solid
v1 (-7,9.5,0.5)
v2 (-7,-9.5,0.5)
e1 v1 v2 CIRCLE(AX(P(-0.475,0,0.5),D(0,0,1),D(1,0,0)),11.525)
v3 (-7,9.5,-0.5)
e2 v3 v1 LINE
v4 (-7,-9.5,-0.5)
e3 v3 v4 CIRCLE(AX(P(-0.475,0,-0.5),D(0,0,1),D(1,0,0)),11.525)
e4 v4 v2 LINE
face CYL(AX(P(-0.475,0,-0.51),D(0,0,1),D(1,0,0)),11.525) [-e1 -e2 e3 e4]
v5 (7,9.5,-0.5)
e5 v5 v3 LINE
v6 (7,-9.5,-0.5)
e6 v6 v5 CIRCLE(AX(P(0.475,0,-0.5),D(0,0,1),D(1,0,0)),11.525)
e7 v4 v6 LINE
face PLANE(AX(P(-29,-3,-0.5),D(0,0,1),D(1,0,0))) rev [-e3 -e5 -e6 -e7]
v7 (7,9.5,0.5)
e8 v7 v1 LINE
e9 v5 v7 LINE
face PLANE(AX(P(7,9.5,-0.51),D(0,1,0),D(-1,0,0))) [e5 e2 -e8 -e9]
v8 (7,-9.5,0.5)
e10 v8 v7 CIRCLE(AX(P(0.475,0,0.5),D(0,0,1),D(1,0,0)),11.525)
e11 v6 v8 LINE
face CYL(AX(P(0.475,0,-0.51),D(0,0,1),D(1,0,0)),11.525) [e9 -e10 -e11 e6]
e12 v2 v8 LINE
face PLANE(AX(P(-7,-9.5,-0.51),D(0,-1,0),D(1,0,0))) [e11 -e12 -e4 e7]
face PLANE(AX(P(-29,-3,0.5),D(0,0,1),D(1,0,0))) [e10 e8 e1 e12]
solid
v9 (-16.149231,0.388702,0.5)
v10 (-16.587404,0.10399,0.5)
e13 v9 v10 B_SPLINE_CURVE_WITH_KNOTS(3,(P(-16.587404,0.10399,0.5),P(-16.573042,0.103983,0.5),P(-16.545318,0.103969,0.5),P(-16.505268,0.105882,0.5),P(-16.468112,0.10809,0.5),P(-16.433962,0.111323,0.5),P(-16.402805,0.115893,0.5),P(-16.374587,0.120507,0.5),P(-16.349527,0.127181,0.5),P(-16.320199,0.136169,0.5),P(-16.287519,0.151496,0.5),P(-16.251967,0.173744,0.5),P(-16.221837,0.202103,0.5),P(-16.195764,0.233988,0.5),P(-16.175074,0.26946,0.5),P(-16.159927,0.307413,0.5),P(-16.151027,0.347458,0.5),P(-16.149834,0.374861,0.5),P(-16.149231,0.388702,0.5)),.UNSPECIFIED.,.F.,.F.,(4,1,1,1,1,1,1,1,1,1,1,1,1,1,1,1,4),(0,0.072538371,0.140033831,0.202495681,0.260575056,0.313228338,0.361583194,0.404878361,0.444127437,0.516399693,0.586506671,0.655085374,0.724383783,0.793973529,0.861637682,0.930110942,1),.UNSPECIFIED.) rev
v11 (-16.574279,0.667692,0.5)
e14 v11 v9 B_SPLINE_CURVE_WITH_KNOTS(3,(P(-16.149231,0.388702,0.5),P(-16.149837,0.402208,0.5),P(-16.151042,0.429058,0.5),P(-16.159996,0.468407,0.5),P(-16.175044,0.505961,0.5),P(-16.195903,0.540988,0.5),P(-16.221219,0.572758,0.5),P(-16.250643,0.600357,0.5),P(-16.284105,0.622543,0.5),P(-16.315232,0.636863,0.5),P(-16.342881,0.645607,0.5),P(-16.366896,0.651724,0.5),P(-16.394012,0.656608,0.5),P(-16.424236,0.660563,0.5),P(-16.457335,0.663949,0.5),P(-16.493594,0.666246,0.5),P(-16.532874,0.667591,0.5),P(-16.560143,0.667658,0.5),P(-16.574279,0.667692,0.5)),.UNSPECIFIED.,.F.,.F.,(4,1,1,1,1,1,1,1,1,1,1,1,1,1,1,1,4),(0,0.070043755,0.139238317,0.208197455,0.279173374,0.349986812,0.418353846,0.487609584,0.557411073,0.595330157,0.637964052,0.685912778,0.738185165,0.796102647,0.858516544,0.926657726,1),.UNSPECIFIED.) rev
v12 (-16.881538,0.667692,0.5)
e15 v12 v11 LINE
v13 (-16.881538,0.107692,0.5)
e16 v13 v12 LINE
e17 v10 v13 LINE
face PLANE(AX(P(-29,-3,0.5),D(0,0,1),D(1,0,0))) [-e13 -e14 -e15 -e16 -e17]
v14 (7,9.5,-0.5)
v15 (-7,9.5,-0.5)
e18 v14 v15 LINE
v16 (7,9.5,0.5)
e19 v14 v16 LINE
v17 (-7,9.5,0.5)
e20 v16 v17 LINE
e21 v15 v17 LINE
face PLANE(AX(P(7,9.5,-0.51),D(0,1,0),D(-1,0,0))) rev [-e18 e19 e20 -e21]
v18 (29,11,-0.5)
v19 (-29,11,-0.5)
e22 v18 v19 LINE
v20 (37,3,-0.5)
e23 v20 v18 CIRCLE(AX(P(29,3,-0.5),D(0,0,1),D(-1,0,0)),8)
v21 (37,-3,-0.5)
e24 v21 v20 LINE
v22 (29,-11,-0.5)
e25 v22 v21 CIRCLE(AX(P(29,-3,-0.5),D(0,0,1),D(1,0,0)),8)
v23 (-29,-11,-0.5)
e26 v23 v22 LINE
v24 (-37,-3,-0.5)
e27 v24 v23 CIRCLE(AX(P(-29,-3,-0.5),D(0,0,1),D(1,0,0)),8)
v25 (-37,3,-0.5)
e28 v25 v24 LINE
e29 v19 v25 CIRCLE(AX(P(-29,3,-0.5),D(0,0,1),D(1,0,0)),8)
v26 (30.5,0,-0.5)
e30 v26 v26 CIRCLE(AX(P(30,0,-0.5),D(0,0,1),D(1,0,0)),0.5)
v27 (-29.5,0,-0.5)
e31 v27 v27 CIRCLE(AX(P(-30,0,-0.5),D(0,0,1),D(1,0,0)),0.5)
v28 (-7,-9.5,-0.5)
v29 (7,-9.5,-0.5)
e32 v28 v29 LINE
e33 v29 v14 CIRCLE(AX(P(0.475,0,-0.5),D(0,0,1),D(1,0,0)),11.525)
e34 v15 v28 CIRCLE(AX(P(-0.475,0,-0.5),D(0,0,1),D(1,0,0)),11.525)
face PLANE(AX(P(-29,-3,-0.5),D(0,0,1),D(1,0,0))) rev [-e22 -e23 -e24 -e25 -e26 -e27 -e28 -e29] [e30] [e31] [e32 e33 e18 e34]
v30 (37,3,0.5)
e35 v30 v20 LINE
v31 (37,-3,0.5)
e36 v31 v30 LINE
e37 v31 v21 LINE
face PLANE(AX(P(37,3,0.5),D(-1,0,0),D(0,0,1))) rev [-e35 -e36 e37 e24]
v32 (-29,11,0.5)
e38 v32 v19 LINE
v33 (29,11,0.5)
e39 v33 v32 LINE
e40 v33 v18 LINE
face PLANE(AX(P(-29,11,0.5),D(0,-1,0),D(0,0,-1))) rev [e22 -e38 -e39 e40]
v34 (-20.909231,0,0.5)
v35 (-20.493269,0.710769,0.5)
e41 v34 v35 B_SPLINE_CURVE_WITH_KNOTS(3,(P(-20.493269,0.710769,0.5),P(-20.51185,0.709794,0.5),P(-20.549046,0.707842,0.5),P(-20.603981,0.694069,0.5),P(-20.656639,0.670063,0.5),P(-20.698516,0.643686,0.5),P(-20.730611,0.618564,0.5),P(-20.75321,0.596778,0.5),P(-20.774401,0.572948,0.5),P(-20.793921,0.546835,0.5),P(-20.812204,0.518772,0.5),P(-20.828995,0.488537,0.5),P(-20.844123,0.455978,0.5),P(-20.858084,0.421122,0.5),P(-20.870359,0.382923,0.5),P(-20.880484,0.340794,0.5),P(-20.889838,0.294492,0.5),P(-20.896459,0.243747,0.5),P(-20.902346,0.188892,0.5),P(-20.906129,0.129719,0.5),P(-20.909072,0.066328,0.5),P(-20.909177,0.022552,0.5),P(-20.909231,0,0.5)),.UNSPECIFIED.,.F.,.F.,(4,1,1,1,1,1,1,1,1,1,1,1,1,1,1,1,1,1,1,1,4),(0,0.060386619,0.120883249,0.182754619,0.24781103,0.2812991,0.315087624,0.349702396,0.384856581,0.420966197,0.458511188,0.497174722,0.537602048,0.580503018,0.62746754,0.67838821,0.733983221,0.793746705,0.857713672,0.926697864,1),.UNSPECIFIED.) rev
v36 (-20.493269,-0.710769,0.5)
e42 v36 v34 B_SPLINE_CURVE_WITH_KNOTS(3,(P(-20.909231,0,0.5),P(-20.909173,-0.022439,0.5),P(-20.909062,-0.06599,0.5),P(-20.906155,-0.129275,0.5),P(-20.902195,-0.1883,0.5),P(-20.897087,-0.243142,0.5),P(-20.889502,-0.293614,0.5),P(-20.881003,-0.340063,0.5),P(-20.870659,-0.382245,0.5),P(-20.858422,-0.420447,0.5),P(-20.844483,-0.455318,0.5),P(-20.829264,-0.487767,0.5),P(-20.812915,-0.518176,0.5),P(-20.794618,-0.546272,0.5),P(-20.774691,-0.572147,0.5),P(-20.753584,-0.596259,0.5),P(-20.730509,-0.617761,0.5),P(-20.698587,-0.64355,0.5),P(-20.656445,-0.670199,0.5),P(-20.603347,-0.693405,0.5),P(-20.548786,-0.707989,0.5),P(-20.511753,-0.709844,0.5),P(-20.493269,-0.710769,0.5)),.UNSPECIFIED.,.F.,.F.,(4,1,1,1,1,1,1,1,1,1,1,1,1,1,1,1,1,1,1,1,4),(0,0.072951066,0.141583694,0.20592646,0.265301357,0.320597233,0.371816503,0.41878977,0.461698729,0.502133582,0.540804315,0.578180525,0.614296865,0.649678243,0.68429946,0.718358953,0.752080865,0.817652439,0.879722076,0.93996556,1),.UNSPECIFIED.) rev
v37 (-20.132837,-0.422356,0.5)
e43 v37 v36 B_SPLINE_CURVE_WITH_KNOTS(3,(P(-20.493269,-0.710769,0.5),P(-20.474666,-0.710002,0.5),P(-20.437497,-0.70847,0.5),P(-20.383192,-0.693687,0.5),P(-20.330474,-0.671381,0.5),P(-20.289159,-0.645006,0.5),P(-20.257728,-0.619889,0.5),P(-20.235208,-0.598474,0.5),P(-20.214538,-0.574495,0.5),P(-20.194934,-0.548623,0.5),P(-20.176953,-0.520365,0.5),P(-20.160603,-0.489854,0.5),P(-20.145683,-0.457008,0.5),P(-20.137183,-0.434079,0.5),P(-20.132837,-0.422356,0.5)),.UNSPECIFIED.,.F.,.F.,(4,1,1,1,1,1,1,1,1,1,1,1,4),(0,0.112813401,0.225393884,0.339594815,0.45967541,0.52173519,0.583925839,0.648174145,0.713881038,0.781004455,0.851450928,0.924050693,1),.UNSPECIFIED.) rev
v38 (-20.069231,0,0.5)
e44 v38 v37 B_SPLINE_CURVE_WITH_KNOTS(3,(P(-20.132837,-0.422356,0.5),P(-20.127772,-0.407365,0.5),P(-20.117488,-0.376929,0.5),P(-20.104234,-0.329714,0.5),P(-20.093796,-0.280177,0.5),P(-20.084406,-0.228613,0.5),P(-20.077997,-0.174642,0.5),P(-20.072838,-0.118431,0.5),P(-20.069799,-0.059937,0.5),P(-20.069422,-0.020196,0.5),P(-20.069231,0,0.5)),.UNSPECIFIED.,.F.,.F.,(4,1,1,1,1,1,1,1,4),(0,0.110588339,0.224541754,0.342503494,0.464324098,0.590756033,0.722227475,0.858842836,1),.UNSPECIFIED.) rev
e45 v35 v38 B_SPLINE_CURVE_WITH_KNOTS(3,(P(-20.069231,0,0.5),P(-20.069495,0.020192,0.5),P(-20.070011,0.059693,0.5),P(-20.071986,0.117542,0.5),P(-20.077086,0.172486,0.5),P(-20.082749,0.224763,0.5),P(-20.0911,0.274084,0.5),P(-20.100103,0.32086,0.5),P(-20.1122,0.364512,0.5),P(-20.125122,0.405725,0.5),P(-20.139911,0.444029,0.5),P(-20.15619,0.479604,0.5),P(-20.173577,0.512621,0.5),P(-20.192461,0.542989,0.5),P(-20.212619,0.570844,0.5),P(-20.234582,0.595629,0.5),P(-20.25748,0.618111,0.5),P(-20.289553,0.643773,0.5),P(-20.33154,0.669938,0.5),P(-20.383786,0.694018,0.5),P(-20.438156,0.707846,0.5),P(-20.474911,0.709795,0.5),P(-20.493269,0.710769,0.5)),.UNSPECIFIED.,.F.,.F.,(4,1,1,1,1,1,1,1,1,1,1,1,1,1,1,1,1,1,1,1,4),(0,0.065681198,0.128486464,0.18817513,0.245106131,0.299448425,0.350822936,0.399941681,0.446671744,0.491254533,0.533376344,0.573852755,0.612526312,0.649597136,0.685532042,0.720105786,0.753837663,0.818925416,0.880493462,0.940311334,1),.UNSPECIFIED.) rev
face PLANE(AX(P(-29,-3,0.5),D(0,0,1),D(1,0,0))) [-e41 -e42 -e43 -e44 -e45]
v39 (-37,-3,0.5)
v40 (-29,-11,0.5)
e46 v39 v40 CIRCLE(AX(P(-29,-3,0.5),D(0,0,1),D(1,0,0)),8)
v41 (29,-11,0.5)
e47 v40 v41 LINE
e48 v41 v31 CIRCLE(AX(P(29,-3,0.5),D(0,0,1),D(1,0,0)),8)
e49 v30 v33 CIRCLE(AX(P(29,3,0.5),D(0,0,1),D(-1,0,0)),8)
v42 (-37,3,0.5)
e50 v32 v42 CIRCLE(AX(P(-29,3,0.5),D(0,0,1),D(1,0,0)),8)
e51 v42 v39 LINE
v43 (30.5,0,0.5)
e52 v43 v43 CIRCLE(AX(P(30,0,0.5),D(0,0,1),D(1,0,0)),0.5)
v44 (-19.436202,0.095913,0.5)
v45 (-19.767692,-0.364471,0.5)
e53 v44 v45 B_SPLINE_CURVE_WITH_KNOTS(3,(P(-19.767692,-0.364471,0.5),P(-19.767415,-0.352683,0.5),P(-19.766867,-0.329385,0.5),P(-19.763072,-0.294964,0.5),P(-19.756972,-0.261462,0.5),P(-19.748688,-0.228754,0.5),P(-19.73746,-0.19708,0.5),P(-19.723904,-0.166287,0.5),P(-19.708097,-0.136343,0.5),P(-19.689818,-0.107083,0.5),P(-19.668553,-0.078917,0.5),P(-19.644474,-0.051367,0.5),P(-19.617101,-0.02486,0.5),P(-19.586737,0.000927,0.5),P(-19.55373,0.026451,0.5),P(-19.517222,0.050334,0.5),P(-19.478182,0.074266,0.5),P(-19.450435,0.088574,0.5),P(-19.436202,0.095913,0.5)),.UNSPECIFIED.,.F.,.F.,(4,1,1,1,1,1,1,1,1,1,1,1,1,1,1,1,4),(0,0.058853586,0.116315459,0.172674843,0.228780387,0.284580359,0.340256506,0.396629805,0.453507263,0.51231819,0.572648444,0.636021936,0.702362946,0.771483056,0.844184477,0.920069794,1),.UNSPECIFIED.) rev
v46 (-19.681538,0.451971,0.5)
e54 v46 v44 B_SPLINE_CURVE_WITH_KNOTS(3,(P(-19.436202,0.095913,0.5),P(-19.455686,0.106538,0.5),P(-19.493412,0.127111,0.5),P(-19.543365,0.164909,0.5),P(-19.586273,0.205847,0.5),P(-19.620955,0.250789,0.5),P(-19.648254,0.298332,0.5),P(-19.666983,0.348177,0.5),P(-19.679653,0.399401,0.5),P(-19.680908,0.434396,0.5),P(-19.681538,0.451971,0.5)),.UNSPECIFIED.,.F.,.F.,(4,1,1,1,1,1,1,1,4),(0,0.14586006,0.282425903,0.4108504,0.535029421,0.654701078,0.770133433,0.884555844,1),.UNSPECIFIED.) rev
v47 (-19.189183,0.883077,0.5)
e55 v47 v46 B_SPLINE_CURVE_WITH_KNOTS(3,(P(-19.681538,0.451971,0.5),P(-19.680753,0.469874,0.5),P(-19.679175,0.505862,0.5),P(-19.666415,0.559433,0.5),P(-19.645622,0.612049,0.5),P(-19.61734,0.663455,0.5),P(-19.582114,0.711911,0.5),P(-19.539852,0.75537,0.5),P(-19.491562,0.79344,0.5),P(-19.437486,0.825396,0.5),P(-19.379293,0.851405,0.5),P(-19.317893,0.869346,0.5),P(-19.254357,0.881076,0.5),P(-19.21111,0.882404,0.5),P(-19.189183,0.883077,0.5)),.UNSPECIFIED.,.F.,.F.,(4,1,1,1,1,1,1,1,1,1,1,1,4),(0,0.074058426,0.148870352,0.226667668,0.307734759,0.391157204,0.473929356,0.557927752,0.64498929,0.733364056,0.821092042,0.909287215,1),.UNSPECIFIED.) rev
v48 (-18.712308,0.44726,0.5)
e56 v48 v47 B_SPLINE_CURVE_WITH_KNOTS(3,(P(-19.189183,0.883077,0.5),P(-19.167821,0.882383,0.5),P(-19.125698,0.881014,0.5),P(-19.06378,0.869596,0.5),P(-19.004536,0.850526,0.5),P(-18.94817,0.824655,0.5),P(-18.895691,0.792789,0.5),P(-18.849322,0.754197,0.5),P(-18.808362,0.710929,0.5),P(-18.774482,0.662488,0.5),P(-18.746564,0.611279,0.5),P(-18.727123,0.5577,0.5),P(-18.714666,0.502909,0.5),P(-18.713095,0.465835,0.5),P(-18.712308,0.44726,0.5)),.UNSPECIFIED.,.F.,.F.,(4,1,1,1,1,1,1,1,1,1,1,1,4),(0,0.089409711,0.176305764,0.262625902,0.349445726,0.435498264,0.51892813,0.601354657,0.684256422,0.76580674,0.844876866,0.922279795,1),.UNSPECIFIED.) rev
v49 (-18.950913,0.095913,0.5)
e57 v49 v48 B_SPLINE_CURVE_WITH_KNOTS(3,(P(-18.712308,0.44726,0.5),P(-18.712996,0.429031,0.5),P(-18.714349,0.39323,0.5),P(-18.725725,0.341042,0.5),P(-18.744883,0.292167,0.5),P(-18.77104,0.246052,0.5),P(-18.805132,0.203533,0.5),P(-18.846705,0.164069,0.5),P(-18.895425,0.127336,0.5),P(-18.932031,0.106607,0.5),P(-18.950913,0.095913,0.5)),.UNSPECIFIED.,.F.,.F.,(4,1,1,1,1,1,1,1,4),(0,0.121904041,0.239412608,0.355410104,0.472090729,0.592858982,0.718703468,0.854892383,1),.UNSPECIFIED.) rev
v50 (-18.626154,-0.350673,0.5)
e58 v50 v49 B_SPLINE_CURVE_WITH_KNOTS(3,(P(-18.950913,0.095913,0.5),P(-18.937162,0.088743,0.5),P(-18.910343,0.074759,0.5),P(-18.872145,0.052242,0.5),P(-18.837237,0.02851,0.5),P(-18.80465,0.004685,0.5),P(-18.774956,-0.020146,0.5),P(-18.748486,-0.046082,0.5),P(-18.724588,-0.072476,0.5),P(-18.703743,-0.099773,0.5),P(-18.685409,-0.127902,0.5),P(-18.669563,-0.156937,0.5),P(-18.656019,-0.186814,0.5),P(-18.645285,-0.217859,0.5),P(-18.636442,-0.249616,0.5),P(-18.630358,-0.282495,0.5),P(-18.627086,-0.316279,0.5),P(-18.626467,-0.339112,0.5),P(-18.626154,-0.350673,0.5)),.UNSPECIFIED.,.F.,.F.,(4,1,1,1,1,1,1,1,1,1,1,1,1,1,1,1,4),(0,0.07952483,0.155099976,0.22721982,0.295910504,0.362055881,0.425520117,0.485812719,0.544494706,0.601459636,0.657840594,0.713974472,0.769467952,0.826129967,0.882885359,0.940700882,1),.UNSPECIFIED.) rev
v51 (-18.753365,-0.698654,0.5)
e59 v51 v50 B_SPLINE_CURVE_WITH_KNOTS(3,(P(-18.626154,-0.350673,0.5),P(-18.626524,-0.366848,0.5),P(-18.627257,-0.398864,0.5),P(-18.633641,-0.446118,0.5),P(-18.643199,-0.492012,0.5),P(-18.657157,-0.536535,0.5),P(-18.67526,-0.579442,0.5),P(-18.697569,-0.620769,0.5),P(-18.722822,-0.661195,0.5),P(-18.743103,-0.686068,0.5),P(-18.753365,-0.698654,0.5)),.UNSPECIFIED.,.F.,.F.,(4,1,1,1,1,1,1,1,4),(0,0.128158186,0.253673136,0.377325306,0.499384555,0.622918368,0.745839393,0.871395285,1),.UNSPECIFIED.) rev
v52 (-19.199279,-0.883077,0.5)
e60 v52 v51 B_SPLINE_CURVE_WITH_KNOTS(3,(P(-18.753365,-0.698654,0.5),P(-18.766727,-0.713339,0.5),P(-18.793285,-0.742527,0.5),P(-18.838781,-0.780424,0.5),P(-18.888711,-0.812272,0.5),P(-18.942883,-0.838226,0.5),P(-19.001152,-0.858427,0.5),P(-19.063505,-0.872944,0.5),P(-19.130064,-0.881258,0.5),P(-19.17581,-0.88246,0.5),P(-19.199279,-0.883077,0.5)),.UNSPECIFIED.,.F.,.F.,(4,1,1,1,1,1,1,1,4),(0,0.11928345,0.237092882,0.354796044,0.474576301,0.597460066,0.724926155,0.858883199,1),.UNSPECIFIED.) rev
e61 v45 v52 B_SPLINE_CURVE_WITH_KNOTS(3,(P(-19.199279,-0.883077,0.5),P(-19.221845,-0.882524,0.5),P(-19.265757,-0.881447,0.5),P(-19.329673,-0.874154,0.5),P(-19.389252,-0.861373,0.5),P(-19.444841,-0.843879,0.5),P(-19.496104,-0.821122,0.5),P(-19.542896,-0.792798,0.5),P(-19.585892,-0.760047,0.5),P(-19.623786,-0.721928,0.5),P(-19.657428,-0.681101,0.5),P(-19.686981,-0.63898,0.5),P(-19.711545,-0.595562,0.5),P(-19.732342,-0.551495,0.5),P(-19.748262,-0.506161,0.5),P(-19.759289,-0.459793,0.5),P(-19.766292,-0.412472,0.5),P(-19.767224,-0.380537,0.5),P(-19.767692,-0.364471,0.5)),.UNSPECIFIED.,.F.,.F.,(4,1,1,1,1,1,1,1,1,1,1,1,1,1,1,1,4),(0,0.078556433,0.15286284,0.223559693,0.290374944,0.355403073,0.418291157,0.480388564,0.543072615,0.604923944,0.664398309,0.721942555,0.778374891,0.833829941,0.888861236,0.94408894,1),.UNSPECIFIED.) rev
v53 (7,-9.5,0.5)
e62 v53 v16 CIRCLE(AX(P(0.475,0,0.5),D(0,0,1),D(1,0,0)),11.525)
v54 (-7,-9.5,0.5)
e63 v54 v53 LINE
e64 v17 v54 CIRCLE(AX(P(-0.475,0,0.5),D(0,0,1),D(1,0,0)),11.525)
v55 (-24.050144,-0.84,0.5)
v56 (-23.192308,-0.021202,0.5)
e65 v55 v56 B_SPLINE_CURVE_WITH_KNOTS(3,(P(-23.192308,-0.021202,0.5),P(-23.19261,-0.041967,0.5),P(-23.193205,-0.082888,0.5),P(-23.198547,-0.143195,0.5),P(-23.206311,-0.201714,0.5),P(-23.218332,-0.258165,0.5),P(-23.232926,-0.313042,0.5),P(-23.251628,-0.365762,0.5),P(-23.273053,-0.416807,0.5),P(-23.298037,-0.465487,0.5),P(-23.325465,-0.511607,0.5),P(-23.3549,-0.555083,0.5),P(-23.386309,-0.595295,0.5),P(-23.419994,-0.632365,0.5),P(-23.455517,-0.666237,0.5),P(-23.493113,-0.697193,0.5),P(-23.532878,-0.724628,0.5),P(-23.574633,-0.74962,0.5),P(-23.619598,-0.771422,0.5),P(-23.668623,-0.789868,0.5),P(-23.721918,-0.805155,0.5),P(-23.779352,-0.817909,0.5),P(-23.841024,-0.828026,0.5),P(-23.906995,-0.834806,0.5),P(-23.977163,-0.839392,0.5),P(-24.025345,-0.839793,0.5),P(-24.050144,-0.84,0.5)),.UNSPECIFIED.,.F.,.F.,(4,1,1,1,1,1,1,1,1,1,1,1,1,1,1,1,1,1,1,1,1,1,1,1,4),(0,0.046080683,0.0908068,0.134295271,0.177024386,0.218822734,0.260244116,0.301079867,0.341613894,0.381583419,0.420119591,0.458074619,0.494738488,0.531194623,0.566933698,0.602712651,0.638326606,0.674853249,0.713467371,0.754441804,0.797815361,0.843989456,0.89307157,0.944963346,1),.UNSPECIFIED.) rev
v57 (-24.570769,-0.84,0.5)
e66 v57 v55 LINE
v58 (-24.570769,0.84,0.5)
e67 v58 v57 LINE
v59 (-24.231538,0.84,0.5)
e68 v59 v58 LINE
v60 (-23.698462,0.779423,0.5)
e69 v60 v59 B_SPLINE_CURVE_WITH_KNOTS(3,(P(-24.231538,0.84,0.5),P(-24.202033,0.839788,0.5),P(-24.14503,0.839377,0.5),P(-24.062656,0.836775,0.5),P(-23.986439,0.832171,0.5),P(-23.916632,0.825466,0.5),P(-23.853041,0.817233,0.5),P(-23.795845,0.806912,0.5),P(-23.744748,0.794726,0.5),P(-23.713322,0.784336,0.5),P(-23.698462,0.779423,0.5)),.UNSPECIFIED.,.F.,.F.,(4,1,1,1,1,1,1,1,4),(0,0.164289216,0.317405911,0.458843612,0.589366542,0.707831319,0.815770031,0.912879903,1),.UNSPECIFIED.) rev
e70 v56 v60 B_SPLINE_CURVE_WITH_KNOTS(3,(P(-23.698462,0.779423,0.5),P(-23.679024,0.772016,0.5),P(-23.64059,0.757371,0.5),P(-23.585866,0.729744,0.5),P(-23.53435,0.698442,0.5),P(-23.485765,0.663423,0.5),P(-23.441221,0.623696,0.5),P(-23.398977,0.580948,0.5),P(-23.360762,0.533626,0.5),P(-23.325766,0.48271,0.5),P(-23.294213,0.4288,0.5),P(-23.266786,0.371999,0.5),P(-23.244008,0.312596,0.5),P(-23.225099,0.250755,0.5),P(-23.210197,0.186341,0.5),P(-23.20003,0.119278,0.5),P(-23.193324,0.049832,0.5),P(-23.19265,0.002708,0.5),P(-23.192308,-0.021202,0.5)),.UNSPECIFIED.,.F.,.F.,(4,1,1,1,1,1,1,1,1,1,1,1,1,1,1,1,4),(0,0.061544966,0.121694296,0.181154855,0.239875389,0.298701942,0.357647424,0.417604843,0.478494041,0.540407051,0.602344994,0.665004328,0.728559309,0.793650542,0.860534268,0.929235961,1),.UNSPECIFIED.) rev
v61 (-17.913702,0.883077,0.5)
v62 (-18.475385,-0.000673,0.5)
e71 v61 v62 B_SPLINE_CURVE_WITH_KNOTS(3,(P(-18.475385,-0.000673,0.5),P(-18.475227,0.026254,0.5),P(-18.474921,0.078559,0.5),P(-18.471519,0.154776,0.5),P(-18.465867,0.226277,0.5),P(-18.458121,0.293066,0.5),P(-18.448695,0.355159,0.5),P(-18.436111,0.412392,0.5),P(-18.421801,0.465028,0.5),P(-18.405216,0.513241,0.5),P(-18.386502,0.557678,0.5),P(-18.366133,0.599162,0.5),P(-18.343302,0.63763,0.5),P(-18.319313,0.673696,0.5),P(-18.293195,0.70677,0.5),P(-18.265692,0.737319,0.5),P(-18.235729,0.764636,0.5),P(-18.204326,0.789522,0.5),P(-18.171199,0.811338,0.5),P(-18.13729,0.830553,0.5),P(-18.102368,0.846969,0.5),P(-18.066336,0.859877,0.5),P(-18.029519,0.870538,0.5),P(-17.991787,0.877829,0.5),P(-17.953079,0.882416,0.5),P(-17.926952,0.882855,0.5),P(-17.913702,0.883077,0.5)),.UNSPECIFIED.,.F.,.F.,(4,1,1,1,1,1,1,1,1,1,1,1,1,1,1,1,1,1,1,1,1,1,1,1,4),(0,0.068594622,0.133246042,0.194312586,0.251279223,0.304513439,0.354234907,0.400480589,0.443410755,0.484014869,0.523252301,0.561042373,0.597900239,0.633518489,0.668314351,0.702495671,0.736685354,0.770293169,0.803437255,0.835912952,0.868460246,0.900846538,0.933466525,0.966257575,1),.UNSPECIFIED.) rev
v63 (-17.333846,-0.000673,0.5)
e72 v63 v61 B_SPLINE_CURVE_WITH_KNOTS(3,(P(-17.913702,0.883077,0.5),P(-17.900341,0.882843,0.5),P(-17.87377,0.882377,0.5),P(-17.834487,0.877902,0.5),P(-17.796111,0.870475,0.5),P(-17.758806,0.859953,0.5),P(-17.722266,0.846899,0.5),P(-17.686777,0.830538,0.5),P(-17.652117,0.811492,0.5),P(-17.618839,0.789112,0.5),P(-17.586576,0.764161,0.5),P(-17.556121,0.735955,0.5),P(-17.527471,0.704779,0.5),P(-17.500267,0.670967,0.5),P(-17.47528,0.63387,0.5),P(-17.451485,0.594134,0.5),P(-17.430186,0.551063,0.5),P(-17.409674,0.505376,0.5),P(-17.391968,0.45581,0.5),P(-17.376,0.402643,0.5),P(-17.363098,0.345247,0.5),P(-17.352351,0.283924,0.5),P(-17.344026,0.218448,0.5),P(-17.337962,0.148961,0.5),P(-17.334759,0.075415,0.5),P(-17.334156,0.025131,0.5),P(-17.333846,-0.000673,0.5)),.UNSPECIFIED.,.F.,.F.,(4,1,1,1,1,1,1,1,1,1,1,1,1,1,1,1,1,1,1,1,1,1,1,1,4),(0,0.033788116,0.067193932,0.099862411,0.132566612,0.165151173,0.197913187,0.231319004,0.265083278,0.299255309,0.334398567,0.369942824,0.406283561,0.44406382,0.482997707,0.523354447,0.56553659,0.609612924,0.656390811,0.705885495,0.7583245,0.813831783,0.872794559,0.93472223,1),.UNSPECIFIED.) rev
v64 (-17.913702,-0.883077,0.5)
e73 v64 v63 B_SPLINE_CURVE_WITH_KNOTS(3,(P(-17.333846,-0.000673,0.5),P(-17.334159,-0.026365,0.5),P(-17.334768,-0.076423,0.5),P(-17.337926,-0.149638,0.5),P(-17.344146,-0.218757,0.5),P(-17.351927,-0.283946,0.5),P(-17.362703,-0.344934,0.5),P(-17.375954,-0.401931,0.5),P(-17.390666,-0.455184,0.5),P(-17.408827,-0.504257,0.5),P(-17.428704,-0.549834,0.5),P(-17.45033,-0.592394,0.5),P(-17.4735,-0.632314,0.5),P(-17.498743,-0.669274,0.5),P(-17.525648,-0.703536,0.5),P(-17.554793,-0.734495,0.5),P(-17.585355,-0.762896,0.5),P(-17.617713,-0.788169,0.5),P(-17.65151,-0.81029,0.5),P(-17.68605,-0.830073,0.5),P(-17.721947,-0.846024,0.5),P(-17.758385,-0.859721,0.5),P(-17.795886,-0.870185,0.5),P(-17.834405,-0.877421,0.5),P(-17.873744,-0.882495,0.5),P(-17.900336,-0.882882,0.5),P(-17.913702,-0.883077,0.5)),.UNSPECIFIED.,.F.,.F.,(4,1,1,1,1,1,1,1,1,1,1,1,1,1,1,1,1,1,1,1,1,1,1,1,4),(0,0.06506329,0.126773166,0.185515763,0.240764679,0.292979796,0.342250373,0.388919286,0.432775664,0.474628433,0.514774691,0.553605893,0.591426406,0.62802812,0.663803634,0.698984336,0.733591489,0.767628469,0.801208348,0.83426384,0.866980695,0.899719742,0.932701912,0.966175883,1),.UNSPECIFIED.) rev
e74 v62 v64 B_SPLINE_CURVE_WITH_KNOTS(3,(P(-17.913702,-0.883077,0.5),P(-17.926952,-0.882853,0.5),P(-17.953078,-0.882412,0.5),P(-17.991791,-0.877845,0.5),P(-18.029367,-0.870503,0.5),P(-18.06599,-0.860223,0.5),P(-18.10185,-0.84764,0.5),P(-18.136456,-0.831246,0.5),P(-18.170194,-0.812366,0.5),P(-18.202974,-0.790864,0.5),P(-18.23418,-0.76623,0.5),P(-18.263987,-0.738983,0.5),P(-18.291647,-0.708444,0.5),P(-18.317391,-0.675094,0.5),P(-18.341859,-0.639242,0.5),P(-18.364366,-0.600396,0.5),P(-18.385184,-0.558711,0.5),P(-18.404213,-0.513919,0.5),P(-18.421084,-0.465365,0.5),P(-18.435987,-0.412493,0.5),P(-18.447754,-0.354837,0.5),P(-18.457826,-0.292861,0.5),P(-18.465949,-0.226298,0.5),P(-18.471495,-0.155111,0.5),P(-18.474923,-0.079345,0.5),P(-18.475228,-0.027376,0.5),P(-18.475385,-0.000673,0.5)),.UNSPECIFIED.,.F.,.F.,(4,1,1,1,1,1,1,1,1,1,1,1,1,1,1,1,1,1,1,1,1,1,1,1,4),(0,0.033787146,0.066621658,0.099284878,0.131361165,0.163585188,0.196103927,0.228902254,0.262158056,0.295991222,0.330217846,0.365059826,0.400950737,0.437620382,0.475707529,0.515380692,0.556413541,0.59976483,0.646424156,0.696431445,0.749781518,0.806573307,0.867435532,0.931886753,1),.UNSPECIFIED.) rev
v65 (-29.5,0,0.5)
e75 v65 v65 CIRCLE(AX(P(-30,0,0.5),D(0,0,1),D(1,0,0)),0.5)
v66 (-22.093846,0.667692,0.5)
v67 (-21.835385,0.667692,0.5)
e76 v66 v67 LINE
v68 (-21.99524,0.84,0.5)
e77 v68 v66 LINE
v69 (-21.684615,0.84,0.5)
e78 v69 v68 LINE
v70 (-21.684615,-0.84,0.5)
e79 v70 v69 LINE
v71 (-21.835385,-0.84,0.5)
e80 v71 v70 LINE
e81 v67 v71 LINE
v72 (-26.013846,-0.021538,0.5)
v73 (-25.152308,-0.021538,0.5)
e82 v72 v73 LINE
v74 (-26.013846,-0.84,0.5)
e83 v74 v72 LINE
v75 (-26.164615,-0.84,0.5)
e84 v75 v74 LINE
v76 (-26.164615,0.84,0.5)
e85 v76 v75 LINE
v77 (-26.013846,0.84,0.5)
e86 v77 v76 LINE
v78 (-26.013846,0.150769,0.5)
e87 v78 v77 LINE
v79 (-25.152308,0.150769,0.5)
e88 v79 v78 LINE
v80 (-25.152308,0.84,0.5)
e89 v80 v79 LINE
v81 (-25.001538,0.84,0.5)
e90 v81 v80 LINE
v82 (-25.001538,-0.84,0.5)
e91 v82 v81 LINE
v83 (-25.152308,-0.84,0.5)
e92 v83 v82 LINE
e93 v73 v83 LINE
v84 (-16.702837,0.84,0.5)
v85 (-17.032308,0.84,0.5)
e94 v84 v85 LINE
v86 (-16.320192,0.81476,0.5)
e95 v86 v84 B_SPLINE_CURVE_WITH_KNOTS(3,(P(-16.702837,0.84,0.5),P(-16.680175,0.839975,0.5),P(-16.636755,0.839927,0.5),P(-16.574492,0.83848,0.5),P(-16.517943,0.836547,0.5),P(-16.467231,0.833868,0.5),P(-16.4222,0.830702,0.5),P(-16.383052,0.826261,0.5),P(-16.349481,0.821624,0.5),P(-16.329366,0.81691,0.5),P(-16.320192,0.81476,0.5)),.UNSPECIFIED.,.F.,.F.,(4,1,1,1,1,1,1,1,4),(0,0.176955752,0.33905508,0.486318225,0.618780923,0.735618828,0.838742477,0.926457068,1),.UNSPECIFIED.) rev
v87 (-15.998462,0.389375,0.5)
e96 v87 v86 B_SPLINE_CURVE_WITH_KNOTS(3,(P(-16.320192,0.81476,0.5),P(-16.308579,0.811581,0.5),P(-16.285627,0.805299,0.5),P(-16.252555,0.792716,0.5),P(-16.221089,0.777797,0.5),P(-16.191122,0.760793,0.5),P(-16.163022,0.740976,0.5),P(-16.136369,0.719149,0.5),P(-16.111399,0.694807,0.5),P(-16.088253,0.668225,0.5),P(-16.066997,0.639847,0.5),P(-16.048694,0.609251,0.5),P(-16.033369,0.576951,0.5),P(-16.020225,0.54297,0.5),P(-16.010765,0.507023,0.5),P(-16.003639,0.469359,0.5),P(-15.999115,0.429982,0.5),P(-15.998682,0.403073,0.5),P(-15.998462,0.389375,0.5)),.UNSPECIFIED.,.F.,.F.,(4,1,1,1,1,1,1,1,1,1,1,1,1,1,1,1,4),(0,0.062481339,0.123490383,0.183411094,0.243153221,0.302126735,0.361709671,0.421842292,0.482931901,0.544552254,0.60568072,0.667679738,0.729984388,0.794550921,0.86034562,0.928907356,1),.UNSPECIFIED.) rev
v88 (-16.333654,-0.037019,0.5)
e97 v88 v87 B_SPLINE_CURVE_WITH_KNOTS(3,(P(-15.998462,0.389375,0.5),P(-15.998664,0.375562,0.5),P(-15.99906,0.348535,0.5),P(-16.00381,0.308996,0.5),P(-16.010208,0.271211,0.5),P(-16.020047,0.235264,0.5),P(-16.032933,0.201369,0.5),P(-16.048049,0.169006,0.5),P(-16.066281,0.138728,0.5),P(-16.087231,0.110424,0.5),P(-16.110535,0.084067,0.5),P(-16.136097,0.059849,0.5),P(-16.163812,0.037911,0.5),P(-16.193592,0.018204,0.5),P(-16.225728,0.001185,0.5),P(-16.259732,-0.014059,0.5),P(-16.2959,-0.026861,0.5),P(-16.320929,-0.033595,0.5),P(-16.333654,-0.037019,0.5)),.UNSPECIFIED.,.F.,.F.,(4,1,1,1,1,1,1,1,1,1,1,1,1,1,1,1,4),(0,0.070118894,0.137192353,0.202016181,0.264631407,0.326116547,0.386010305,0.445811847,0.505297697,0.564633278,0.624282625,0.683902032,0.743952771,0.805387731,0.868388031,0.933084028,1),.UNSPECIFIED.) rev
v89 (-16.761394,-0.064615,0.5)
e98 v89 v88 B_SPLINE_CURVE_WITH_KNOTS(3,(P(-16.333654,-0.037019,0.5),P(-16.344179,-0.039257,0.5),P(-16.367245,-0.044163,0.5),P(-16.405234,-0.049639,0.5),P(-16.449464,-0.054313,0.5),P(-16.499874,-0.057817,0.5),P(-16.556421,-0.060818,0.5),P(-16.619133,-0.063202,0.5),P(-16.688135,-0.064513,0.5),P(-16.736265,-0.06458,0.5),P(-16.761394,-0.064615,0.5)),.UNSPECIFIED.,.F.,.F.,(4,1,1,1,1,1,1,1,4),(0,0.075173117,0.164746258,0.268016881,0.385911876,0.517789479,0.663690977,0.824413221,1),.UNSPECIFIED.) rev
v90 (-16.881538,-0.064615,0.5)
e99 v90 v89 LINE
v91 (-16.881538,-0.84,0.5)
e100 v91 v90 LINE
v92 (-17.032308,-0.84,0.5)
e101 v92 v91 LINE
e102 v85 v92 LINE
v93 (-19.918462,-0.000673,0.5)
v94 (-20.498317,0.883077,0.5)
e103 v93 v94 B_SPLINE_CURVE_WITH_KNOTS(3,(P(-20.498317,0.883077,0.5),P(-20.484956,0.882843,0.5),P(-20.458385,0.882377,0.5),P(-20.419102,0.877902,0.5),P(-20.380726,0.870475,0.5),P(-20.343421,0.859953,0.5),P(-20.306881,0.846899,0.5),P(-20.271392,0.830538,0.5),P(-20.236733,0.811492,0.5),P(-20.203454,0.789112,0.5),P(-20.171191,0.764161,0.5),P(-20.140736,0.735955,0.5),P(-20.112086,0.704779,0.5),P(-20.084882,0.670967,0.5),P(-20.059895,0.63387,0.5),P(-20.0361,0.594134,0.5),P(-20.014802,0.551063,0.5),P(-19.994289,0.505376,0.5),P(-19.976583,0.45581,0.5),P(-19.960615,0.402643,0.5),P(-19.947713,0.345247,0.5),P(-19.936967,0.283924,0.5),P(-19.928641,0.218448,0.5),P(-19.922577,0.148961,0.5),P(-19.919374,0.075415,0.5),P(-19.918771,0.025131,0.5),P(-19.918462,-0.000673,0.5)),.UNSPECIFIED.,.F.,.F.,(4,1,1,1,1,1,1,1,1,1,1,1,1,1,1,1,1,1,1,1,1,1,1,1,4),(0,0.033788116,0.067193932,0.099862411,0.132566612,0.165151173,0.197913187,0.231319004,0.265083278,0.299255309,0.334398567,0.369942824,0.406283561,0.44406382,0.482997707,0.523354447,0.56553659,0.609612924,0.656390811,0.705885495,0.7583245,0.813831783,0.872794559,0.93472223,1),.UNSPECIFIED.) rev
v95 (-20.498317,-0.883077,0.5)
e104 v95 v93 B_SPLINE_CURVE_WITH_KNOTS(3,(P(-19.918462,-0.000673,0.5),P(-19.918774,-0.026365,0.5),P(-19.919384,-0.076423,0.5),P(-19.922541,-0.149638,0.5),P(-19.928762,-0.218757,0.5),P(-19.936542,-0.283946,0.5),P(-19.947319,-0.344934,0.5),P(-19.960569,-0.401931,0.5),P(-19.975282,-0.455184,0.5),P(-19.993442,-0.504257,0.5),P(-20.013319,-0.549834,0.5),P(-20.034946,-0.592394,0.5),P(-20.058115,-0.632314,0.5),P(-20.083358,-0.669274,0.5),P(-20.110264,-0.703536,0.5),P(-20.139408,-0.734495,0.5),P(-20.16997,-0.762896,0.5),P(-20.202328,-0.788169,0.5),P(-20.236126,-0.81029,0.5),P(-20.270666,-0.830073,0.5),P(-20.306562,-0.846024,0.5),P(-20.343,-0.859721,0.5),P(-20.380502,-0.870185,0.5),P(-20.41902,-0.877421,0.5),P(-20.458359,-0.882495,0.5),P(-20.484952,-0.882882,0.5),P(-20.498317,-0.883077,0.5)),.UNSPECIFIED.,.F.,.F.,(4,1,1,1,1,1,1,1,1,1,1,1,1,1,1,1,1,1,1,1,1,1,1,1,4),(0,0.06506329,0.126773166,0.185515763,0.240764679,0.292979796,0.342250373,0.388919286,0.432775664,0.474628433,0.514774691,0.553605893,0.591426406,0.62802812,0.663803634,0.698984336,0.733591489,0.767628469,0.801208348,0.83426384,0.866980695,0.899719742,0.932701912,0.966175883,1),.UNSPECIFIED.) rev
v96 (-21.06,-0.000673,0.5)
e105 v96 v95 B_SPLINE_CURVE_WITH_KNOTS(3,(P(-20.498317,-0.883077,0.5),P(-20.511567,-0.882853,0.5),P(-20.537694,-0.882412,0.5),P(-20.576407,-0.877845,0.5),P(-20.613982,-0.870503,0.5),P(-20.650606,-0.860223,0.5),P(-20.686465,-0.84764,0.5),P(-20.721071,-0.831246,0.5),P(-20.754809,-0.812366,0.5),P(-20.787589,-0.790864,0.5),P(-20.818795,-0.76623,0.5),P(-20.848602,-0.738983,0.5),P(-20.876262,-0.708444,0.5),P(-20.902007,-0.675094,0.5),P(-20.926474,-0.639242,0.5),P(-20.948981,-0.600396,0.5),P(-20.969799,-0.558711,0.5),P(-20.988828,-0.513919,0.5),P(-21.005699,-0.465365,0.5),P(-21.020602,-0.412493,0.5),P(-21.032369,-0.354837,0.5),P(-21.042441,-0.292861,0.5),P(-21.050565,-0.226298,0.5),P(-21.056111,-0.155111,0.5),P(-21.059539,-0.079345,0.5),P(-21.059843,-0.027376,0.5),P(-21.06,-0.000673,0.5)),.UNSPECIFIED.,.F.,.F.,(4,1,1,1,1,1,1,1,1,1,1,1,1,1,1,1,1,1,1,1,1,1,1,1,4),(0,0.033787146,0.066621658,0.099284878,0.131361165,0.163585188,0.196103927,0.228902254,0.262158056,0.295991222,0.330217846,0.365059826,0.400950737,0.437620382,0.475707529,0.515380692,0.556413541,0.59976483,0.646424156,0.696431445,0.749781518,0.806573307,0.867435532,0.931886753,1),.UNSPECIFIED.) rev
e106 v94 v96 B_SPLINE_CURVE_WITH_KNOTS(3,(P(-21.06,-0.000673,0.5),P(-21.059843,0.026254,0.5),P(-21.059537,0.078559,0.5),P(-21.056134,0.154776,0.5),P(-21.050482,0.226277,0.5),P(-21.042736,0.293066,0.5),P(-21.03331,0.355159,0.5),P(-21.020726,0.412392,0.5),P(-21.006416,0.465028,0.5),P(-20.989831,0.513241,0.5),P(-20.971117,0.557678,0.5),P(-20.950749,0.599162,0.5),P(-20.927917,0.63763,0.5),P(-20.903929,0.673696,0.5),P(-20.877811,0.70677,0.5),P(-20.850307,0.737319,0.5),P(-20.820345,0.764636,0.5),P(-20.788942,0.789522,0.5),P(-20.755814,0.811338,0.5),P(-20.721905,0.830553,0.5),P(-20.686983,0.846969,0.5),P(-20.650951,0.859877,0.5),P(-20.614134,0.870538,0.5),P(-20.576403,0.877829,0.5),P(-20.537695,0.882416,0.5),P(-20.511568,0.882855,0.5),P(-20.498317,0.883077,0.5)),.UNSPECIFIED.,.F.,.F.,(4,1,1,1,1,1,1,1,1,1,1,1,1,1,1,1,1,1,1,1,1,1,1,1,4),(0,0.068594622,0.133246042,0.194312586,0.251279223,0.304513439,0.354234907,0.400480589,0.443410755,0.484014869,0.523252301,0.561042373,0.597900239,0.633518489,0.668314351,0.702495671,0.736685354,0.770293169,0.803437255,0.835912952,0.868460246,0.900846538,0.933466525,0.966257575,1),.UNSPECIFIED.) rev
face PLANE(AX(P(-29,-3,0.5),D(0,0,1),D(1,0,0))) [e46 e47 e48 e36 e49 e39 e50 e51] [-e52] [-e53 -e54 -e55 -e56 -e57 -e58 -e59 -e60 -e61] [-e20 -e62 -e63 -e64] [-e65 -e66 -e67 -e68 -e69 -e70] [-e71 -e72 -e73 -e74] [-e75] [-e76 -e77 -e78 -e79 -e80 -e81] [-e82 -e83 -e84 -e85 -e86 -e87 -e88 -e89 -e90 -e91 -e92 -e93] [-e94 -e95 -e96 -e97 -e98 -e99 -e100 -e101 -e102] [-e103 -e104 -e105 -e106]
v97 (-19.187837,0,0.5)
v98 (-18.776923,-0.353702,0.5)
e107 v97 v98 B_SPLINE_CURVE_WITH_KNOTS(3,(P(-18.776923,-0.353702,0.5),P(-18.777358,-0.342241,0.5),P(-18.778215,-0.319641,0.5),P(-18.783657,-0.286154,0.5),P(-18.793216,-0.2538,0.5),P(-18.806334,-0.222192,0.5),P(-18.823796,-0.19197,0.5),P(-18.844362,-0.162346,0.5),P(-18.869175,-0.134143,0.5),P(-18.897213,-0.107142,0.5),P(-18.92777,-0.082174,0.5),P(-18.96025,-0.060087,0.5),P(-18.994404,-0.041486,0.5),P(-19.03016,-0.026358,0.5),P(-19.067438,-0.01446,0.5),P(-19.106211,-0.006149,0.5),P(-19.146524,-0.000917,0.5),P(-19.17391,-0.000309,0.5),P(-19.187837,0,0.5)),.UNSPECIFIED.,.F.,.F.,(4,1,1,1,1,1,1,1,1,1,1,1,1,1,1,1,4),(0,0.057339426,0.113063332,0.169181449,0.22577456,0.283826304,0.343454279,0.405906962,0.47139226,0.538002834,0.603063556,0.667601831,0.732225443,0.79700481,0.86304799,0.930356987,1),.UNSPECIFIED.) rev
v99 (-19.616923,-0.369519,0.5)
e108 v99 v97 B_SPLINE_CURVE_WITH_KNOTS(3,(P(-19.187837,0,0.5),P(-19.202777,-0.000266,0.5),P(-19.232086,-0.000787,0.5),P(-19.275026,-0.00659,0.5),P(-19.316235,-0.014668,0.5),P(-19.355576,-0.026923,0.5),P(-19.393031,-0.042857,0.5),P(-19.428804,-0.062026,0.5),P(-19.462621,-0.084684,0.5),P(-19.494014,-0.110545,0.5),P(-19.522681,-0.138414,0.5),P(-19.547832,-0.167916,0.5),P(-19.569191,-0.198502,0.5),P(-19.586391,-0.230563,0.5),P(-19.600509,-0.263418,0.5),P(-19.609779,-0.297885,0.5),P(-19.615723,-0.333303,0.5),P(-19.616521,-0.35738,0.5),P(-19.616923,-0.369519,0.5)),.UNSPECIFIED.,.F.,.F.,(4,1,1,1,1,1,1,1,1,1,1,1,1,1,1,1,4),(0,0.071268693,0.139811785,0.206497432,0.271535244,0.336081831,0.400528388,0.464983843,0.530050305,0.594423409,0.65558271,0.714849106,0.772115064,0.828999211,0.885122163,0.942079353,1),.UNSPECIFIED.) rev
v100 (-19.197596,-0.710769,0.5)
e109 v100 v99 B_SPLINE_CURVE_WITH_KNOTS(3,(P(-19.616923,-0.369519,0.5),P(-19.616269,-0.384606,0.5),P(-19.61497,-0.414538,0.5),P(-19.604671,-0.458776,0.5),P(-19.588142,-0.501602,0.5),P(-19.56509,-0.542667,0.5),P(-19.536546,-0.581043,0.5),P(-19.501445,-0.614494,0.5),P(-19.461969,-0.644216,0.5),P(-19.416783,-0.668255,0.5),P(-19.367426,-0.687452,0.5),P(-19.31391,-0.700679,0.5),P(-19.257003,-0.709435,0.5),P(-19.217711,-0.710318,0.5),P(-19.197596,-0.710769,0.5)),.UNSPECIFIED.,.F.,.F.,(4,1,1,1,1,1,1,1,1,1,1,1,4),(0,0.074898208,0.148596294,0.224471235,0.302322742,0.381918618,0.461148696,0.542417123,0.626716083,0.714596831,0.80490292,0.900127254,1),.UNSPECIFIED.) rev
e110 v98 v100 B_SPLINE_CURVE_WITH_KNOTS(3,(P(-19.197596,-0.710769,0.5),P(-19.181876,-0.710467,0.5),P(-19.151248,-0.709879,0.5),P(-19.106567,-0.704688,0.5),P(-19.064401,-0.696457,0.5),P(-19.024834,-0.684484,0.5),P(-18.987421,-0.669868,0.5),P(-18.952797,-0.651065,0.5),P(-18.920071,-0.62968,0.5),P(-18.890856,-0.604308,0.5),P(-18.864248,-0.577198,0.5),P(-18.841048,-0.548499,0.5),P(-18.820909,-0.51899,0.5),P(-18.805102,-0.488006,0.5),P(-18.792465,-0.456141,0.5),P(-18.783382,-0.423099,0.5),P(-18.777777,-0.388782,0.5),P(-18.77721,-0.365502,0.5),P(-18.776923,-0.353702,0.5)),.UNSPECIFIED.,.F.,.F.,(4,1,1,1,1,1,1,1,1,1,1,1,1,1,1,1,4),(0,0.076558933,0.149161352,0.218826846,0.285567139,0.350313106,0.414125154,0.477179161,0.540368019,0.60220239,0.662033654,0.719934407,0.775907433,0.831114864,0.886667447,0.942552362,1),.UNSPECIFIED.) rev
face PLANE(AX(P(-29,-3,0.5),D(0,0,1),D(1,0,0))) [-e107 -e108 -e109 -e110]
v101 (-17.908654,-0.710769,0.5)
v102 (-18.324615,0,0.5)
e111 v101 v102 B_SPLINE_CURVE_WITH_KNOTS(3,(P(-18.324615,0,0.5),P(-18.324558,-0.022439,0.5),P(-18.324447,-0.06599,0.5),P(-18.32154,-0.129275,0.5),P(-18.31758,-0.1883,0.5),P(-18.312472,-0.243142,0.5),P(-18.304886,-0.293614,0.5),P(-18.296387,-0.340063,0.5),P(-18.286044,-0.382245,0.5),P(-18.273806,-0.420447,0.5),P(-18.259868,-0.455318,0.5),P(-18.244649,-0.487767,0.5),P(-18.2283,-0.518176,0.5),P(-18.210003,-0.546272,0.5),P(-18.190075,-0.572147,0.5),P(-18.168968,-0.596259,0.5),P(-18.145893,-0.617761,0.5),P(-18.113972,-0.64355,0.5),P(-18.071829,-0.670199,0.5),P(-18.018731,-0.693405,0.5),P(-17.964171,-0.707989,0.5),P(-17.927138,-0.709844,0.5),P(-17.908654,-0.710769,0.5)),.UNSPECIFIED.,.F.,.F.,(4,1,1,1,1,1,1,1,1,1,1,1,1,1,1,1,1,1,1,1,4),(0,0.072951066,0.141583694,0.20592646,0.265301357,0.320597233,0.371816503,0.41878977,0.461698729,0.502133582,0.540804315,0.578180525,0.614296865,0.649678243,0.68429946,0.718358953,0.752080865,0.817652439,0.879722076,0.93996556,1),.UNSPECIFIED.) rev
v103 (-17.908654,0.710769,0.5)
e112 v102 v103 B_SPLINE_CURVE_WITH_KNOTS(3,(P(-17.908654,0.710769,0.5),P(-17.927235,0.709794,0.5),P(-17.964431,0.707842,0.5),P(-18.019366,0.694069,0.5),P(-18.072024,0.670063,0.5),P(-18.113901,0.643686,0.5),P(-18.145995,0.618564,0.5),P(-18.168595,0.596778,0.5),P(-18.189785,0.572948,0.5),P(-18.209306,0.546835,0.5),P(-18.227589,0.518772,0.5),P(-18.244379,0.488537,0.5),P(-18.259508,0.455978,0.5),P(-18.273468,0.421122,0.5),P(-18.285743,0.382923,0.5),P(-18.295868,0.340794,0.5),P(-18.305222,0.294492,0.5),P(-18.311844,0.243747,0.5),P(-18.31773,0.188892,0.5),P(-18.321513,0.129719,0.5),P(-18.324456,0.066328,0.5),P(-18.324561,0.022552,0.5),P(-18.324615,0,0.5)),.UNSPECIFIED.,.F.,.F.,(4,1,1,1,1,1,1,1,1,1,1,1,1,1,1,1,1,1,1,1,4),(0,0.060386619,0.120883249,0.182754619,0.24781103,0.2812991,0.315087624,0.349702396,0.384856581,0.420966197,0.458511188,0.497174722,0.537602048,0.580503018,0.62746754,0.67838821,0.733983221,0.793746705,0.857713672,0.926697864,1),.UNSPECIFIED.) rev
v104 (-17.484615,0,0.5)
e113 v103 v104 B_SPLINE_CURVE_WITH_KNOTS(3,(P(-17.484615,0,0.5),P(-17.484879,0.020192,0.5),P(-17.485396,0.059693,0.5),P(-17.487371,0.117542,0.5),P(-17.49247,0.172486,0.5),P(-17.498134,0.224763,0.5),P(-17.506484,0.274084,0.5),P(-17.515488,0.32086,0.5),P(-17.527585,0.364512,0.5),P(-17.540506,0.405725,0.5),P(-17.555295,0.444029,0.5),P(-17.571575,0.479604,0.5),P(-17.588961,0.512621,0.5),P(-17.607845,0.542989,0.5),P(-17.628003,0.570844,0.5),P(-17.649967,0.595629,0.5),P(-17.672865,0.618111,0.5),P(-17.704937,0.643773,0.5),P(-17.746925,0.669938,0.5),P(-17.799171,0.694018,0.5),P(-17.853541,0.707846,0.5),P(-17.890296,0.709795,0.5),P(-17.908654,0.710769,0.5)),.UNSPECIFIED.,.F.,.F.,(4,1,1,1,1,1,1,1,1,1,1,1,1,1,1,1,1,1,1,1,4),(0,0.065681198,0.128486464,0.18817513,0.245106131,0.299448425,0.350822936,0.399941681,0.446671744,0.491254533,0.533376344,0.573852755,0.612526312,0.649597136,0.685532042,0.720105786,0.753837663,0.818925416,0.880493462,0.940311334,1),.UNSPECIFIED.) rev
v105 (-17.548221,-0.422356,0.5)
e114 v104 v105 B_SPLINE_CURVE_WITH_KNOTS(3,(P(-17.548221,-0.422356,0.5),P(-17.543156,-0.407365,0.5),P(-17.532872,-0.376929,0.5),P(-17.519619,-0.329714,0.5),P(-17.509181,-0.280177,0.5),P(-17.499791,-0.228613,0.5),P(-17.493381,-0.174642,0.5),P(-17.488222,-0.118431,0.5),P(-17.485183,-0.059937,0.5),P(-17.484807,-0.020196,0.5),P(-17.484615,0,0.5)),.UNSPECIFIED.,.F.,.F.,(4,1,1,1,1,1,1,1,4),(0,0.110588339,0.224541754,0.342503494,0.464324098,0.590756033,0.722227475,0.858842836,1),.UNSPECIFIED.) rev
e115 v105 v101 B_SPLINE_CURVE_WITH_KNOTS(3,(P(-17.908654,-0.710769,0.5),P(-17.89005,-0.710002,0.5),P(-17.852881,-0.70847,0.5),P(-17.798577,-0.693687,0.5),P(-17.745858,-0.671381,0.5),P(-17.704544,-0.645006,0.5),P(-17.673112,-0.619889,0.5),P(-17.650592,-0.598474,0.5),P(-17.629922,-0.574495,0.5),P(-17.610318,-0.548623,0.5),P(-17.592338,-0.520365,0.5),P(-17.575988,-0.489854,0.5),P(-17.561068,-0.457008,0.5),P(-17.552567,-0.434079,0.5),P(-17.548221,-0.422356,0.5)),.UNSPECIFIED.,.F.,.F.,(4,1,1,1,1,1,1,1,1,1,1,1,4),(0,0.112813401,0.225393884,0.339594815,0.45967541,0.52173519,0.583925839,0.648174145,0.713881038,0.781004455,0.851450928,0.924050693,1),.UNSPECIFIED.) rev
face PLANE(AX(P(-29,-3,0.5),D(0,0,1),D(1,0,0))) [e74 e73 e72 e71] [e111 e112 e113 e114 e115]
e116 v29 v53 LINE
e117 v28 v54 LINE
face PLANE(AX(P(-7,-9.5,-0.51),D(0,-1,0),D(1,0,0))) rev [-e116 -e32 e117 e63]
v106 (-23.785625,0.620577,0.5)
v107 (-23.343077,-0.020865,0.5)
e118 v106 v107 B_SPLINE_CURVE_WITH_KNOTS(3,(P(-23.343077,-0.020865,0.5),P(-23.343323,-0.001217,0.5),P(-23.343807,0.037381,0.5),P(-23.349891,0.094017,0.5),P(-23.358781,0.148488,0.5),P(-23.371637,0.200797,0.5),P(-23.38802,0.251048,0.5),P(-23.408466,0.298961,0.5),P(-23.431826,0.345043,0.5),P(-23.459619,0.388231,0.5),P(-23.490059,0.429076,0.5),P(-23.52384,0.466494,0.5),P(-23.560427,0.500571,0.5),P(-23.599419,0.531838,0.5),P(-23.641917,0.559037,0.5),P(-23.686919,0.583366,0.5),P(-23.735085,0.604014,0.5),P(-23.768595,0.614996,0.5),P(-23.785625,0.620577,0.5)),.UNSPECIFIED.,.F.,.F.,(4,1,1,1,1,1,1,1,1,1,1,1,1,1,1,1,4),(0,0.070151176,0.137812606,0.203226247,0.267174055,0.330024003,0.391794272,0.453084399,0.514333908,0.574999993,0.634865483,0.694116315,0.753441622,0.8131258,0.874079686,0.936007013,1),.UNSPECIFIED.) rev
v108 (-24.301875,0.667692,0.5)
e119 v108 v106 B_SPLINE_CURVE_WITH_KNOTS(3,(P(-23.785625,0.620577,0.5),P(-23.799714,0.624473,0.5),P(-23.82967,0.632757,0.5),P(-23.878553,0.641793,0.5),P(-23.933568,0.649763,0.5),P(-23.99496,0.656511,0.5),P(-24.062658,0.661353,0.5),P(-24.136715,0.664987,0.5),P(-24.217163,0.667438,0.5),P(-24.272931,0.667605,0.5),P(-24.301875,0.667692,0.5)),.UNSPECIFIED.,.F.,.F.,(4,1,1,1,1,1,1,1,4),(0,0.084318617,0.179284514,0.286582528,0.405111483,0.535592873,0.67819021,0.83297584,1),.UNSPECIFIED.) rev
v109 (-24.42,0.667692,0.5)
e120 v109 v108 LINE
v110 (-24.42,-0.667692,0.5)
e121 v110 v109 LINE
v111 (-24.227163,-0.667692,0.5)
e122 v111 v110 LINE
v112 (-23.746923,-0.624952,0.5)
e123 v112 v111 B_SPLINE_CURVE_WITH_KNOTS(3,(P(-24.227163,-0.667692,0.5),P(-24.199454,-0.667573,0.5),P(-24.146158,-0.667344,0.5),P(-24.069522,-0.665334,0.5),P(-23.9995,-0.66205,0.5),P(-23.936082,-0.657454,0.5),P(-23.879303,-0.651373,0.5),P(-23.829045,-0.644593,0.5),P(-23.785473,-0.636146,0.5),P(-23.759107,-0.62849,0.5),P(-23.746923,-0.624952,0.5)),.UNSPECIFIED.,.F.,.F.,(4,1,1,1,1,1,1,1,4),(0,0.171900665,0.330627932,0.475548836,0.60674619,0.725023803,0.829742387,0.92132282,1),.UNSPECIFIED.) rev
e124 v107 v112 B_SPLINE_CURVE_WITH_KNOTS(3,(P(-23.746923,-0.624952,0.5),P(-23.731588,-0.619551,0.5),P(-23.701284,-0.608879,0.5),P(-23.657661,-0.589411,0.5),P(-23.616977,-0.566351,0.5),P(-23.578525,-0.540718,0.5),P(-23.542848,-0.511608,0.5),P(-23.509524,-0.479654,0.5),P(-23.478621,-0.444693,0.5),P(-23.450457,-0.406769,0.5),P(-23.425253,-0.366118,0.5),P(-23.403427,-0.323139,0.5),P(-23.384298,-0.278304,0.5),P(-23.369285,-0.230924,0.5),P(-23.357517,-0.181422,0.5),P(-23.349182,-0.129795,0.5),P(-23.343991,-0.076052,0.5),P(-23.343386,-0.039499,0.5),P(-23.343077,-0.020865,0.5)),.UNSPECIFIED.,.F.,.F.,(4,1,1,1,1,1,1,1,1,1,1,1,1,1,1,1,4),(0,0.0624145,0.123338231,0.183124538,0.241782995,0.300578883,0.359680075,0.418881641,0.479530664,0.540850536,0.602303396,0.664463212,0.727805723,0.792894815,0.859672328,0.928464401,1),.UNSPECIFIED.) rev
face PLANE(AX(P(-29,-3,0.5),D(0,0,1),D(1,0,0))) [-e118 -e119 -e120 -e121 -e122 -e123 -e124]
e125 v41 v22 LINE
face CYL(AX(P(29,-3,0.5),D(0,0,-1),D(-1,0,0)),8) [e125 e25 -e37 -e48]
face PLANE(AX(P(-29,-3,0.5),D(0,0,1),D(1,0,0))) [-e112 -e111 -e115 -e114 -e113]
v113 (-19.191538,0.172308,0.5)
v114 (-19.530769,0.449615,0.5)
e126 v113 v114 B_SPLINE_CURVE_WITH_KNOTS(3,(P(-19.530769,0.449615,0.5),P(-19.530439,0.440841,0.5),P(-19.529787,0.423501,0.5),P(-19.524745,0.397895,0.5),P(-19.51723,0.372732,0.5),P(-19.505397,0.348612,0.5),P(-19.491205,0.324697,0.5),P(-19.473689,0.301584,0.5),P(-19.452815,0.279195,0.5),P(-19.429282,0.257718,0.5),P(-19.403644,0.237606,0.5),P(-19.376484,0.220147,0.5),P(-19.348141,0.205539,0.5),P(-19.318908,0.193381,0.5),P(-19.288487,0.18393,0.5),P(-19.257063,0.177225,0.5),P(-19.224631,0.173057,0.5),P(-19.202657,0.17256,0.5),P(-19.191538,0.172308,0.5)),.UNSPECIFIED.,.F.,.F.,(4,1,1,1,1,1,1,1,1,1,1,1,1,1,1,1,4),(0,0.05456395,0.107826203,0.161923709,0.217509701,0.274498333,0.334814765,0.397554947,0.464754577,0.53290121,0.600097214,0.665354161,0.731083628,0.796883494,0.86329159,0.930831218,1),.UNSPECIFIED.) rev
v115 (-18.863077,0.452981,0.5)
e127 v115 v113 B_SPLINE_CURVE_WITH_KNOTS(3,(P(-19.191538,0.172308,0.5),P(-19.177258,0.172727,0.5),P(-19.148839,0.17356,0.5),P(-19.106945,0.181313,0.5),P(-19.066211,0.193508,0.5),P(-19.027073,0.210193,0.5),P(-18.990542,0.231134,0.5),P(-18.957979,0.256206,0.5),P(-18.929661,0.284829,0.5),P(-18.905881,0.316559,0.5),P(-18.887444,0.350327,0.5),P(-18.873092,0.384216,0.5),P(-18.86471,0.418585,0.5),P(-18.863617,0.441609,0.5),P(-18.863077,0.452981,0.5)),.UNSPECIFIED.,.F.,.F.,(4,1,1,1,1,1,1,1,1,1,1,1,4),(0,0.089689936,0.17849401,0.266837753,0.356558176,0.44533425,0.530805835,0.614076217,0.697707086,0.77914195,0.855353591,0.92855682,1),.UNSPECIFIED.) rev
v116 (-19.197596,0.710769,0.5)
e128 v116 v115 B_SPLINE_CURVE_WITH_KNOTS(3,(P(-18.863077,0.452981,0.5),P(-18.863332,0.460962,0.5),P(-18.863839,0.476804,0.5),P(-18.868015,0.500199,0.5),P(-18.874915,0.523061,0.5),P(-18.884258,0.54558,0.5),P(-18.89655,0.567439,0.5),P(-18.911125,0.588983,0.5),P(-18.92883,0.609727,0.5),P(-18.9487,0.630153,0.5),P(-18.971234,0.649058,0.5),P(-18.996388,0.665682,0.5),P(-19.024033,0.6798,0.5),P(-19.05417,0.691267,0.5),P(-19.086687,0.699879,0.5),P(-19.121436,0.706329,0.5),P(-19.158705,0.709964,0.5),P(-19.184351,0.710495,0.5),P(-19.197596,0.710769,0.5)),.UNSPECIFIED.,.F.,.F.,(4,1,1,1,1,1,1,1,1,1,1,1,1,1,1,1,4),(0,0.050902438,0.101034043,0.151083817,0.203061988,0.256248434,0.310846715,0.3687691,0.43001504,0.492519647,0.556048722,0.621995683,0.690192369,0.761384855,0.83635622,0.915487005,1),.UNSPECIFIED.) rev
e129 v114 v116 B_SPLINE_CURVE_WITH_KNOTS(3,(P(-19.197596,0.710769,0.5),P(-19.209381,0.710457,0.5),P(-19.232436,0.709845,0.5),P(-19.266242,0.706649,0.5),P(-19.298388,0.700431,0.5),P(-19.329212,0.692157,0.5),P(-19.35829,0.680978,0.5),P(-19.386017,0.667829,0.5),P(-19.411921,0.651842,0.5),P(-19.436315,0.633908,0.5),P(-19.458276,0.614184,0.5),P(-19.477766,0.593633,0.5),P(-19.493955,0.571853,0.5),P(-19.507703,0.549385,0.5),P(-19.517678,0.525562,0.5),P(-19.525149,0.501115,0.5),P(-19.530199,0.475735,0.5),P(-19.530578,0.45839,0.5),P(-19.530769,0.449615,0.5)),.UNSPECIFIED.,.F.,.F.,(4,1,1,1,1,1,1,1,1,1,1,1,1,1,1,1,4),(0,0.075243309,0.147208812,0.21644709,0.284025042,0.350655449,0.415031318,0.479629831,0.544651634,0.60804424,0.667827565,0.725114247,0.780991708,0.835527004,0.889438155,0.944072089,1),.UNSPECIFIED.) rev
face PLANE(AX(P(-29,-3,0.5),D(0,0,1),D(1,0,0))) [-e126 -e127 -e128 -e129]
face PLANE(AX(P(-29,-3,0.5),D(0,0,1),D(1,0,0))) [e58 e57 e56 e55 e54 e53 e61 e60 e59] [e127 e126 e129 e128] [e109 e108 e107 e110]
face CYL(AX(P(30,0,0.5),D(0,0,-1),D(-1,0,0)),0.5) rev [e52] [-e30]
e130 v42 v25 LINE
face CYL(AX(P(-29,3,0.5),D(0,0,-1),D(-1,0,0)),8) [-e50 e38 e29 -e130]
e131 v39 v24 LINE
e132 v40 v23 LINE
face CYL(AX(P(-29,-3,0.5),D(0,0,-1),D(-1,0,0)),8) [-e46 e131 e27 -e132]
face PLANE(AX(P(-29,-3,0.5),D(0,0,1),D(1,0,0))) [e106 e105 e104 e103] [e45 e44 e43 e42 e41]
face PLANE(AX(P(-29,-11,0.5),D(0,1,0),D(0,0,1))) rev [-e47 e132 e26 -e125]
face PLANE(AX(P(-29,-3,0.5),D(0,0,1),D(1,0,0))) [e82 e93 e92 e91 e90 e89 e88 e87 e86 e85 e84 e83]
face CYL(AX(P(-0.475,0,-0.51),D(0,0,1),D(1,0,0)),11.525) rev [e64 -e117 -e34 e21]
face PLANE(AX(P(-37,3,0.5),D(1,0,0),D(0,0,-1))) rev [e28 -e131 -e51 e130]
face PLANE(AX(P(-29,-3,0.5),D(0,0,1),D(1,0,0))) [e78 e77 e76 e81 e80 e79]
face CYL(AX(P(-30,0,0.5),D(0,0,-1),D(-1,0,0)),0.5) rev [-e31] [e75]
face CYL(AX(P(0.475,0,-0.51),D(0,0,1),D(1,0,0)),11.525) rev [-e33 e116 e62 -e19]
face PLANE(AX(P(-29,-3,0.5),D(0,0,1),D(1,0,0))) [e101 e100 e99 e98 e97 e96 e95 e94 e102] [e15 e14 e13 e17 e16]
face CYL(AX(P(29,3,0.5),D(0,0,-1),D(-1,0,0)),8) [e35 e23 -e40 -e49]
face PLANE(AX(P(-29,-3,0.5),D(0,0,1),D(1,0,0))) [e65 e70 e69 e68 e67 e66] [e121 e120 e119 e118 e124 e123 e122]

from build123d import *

# Parameters (mm, degrees)
SKETCH1_R           = 0.5
BOSS_EXTRUDE1_DEPTH = 0.5
SPLIT1_START        = -0.5
SPLIT1_DEPTH        = 1
SPLIT1_2_DEPTH      = 1


# Read off the part's stored shape, not the designer's step: Split1
with BuildPart() as part:
    # Sketch1 → Boss-Extrude1 (new, symmetric)
    with BuildSketch(Plane.XY):
        with BuildLine():
            Line((-29, 11), (29, 11))
            ThreePointArc((29, 11), (34.656854249, 8.656854249), (37, 3))
            Line((37, 3), (37, -3))
            ThreePointArc((37, -3), (34.656854249, -8.656854249), (29, -11))
            Line((29, -11), (-29, -11))
            ThreePointArc((-29, -11), (-34.656854249, -8.656854249), (-37, -3))
            Line((-37, -3), (-37, 3))
            ThreePointArc((-37, 3), (-34.656854249, 8.656854249), (-29, 11))
        make_face()
        with Locations((-30, 0)):
            Circle(SKETCH1_R, mode=Mode.SUBTRACT)
        with Locations((30, 0)):
            Circle(SKETCH1_R, mode=Mode.SUBTRACT)
    extrude(amount=BOSS_EXTRUDE1_DEPTH, both=True)

    # Split1 2 outline → Split1 2 (cut)
    with BuildSketch(Plane.XY.offset(SPLIT1_START)):
        with BuildLine():
            Line((7, 9.5), (-7, 9.5))
            ThreePointArc((-7, 9.5), (-12, 0), (-7, -9.5))
            Line((-7, -9.5), (7, -9.5))
            ThreePointArc((7, -9.5), (12, 0), (7, 9.5))
        make_face()
    extrude(amount=SPLIT1_2_DEPTH, mode=Mode.SUBTRACT)


with BuildPart() as body_2:
    # Split1 outline → Split1 (new body)
    with BuildSketch(Plane.XY.offset(SPLIT1_START)):
        with BuildLine():
            ThreePointArc((7, -9.5), (12, 0), (7, 9.5))
            Line((7, 9.5), (-7, 9.5))
            ThreePointArc((-7, 9.5), (-12, 0), (-7, -9.5))
            Line((-7, -9.5), (7, -9.5))
        make_face()
    extrude(amount=SPLIT1_DEPTH)


solid = Compound([part.part, body_2.part])
